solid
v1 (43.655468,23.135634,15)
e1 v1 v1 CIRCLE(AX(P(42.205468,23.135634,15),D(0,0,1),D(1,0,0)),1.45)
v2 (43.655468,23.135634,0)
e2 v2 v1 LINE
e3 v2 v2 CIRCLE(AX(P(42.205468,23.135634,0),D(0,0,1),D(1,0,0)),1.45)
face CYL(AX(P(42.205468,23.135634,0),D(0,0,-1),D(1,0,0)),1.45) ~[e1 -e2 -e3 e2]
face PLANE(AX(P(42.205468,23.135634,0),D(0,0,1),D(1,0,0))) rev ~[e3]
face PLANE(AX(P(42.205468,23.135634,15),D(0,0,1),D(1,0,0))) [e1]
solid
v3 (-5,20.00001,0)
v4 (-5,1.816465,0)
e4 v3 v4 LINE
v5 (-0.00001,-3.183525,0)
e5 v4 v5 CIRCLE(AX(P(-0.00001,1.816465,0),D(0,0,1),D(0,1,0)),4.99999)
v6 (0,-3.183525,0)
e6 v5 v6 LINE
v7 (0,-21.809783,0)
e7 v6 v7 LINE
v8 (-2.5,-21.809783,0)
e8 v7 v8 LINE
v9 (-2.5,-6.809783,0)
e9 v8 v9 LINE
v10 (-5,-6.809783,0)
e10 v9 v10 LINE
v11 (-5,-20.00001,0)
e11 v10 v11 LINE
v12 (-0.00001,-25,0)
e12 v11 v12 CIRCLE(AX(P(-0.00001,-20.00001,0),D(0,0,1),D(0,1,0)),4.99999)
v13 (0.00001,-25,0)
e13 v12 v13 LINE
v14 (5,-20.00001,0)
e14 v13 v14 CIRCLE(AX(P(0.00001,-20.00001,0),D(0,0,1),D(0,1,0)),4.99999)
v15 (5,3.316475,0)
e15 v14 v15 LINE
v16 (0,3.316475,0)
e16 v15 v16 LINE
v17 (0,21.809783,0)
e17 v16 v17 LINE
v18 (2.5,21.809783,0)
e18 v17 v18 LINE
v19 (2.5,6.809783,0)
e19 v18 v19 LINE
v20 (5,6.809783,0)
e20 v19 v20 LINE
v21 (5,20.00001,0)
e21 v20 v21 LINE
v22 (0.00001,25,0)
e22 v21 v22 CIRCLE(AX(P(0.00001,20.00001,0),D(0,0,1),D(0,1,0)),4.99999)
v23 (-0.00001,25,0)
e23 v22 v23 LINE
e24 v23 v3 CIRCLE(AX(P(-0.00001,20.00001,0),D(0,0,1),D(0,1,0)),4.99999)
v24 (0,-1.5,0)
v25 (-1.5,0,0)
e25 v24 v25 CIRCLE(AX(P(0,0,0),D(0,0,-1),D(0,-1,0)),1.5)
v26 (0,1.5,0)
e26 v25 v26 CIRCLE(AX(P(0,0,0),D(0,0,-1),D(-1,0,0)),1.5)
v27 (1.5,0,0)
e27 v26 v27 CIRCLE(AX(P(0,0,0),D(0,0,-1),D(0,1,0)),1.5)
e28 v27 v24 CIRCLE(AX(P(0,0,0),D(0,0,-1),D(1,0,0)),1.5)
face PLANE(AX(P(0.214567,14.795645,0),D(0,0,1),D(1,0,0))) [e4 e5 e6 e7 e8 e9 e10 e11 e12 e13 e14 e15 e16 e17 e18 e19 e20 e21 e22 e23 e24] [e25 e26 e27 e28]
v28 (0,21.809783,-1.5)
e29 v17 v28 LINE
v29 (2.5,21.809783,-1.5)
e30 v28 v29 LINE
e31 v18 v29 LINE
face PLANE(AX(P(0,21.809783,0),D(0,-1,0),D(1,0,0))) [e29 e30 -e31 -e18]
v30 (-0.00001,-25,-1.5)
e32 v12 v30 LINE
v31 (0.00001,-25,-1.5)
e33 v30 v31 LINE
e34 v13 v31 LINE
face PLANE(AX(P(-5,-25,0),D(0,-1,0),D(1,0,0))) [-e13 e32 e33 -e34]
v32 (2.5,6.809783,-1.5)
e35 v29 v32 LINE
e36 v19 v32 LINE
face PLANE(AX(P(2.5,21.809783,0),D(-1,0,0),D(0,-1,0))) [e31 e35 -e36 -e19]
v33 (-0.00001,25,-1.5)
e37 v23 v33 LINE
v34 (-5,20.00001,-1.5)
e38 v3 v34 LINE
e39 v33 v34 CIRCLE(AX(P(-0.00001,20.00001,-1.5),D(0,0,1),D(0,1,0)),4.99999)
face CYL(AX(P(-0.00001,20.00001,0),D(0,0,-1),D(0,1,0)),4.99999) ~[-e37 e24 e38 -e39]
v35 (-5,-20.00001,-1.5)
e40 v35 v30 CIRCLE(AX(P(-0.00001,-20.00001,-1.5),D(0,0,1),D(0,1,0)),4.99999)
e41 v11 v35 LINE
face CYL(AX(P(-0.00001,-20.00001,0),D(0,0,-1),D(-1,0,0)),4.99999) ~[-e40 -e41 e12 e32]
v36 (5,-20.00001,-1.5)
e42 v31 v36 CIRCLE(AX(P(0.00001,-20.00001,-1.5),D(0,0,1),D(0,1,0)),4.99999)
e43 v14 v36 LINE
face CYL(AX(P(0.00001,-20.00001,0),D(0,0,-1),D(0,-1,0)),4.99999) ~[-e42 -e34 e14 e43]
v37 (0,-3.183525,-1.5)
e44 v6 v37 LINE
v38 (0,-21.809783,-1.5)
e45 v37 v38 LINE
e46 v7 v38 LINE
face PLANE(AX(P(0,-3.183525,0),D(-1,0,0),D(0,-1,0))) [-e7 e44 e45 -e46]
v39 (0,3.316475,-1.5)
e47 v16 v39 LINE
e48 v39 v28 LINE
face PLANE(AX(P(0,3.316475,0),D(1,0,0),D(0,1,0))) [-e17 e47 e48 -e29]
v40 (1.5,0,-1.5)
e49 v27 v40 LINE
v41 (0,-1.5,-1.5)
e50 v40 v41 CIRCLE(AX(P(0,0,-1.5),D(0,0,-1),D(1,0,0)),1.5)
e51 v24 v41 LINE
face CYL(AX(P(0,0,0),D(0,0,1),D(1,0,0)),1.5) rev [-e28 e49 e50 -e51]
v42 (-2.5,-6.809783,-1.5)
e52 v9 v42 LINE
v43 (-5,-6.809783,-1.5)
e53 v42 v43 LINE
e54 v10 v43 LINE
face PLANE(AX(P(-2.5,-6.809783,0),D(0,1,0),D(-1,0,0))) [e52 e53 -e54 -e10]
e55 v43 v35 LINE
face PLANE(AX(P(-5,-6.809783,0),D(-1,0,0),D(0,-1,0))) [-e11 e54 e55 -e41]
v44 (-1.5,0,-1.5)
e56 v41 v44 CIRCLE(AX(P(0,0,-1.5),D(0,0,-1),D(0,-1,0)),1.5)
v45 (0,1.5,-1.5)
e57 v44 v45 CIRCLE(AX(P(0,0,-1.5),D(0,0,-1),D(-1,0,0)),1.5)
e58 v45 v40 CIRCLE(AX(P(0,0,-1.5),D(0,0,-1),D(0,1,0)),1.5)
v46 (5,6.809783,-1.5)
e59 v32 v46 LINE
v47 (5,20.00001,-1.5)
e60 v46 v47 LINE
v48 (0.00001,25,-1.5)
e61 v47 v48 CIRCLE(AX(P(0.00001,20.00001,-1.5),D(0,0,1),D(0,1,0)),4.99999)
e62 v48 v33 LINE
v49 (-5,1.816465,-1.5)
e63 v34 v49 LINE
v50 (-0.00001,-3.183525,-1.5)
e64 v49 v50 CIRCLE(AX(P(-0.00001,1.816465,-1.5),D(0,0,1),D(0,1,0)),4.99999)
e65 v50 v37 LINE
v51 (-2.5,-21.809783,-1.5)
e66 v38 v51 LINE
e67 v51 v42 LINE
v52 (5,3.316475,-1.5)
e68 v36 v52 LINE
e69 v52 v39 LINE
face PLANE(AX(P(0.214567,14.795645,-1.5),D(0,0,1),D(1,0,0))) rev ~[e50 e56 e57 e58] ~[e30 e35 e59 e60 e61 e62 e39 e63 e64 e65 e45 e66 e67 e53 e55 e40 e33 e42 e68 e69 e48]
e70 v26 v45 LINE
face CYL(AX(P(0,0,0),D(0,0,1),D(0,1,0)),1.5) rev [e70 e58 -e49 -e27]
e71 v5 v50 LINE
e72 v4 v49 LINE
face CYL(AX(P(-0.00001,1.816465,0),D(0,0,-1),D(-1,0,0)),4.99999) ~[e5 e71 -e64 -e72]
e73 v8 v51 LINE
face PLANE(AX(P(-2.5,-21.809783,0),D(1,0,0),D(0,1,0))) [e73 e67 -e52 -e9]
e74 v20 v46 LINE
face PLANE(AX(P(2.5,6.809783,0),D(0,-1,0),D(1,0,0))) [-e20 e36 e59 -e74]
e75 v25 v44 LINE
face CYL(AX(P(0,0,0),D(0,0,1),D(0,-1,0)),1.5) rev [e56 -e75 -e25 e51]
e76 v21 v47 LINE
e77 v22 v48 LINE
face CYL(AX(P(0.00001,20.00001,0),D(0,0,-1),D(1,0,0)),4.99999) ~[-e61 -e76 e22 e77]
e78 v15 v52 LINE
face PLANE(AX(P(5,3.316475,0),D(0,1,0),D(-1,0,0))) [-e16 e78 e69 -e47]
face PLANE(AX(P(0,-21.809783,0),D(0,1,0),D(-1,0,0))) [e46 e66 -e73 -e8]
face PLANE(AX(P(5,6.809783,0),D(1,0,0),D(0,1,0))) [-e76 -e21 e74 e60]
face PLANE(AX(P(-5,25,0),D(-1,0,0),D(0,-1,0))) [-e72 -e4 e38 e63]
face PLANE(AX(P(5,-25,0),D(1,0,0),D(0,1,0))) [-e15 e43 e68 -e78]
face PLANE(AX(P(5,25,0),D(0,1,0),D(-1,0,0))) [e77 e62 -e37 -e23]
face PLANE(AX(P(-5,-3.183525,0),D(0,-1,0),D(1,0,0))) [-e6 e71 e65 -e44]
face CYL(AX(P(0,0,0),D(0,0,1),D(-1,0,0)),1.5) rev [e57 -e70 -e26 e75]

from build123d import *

# Parameters (mm, degrees)
F1_DEPTH = 1.5
F2_R     = 4.99999
F0_R     = 1.45
F3_DEPTH = 15


# Not quite as in the source:
# - a fillet or chamfer is up to 0.001 mm smaller than in the source, because OpenCascade refuses the exact size


with BuildPart() as f1:
    # F0 (on Top) → F1 (new body)
    with BuildSketch(Plane.XY):
        Polygon((2.5, 6.8097828329), (5, 6.8097828329), (5, 25), (-5, 25), (-5, 3.3164751772), (0, 3.3164751772), (0, 21.8097828329), (2.5, 21.8097828329), align=None)
        Polygon((-5, -25), (5, -25), (5, -3.1835248228), (0, -3.1835248228), (0, -21.8097828329), (-2.5, -21.8097828329), (-2.5, -6.8097828329), (-5, -6.8097828329), align=None)
        with BuildLine():
            Line((1.5, 0), (5, 0))
            Line((5, 0), (5, 3.3164751772))
            Line((5, 3.3164751772), (0, 3.3164751772))
            Line((0, 3.3164751772), (0, 1.5))
            ThreePointArc((0, 1.5), (1.0606601718, 1.0606601718), (1.5, 0))
        make_face()
        with BuildLine():
            Line((-5, 3.3164751772), (-5, 0))
            Line((-5, 0), (-1.5, 0))
            ThreePointArc((-1.5, 0), (-1.0606601718, 1.0606601718), (0, 1.5))
            Line((0, 1.5), (0, 3.3164751772))
            Line((0, 3.3164751772), (-5, 3.3164751772))
        make_face()
        with BuildLine():
            Line((-5, -3.1835248228), (0, -3.1835248228))
            Line((0, -3.1835248228), (0, -1.5))
            ThreePointArc((0, -1.5), (-1.0606601718, -1.0606601718), (-1.5, 0))
            Line((-1.5, 0), (-5, 0))
            Line((-5, 0), (-5, -3.1835248228))
        make_face()
        with BuildLine():
            Line((0, -3.1835248228), (5, -3.1835248228))
            Line((5, -3.1835248228), (5, 0))
            Line((5, 0), (1.5, 0))
            ThreePointArc((1.5, 0), (1.0606601718, -1.0606601718), (0, -1.5))
            Line((0, -1.5), (0, -3.1835248228))
        make_face()
    extrude(amount=-F1_DEPTH)

    # F2 (radius 5 in the source; OpenCascade refuses exactly that, so slightly less here)
    f2_edges = [f1.edges().sort_by_distance(p)[0] for p in [
        (5, 25, -0.75),
        (-5, 25, -0.75),
        (-5, -3.183525, -0.75),
        (5, -25, -0.75),
        (-5, -25, -0.75),
    ]]
    fillet(f2_edges, radius=F2_R)


with BuildPart() as f3:
    # F0 (on Top) → F3 (new body)
    with BuildSketch(Plane.XY):
        with Locations((42.2054678202, 23.1356341392)):
            Circle(F0_R)
    extrude(amount=F3_DEPTH)


solid = Compound([f1.part, f3.part])
